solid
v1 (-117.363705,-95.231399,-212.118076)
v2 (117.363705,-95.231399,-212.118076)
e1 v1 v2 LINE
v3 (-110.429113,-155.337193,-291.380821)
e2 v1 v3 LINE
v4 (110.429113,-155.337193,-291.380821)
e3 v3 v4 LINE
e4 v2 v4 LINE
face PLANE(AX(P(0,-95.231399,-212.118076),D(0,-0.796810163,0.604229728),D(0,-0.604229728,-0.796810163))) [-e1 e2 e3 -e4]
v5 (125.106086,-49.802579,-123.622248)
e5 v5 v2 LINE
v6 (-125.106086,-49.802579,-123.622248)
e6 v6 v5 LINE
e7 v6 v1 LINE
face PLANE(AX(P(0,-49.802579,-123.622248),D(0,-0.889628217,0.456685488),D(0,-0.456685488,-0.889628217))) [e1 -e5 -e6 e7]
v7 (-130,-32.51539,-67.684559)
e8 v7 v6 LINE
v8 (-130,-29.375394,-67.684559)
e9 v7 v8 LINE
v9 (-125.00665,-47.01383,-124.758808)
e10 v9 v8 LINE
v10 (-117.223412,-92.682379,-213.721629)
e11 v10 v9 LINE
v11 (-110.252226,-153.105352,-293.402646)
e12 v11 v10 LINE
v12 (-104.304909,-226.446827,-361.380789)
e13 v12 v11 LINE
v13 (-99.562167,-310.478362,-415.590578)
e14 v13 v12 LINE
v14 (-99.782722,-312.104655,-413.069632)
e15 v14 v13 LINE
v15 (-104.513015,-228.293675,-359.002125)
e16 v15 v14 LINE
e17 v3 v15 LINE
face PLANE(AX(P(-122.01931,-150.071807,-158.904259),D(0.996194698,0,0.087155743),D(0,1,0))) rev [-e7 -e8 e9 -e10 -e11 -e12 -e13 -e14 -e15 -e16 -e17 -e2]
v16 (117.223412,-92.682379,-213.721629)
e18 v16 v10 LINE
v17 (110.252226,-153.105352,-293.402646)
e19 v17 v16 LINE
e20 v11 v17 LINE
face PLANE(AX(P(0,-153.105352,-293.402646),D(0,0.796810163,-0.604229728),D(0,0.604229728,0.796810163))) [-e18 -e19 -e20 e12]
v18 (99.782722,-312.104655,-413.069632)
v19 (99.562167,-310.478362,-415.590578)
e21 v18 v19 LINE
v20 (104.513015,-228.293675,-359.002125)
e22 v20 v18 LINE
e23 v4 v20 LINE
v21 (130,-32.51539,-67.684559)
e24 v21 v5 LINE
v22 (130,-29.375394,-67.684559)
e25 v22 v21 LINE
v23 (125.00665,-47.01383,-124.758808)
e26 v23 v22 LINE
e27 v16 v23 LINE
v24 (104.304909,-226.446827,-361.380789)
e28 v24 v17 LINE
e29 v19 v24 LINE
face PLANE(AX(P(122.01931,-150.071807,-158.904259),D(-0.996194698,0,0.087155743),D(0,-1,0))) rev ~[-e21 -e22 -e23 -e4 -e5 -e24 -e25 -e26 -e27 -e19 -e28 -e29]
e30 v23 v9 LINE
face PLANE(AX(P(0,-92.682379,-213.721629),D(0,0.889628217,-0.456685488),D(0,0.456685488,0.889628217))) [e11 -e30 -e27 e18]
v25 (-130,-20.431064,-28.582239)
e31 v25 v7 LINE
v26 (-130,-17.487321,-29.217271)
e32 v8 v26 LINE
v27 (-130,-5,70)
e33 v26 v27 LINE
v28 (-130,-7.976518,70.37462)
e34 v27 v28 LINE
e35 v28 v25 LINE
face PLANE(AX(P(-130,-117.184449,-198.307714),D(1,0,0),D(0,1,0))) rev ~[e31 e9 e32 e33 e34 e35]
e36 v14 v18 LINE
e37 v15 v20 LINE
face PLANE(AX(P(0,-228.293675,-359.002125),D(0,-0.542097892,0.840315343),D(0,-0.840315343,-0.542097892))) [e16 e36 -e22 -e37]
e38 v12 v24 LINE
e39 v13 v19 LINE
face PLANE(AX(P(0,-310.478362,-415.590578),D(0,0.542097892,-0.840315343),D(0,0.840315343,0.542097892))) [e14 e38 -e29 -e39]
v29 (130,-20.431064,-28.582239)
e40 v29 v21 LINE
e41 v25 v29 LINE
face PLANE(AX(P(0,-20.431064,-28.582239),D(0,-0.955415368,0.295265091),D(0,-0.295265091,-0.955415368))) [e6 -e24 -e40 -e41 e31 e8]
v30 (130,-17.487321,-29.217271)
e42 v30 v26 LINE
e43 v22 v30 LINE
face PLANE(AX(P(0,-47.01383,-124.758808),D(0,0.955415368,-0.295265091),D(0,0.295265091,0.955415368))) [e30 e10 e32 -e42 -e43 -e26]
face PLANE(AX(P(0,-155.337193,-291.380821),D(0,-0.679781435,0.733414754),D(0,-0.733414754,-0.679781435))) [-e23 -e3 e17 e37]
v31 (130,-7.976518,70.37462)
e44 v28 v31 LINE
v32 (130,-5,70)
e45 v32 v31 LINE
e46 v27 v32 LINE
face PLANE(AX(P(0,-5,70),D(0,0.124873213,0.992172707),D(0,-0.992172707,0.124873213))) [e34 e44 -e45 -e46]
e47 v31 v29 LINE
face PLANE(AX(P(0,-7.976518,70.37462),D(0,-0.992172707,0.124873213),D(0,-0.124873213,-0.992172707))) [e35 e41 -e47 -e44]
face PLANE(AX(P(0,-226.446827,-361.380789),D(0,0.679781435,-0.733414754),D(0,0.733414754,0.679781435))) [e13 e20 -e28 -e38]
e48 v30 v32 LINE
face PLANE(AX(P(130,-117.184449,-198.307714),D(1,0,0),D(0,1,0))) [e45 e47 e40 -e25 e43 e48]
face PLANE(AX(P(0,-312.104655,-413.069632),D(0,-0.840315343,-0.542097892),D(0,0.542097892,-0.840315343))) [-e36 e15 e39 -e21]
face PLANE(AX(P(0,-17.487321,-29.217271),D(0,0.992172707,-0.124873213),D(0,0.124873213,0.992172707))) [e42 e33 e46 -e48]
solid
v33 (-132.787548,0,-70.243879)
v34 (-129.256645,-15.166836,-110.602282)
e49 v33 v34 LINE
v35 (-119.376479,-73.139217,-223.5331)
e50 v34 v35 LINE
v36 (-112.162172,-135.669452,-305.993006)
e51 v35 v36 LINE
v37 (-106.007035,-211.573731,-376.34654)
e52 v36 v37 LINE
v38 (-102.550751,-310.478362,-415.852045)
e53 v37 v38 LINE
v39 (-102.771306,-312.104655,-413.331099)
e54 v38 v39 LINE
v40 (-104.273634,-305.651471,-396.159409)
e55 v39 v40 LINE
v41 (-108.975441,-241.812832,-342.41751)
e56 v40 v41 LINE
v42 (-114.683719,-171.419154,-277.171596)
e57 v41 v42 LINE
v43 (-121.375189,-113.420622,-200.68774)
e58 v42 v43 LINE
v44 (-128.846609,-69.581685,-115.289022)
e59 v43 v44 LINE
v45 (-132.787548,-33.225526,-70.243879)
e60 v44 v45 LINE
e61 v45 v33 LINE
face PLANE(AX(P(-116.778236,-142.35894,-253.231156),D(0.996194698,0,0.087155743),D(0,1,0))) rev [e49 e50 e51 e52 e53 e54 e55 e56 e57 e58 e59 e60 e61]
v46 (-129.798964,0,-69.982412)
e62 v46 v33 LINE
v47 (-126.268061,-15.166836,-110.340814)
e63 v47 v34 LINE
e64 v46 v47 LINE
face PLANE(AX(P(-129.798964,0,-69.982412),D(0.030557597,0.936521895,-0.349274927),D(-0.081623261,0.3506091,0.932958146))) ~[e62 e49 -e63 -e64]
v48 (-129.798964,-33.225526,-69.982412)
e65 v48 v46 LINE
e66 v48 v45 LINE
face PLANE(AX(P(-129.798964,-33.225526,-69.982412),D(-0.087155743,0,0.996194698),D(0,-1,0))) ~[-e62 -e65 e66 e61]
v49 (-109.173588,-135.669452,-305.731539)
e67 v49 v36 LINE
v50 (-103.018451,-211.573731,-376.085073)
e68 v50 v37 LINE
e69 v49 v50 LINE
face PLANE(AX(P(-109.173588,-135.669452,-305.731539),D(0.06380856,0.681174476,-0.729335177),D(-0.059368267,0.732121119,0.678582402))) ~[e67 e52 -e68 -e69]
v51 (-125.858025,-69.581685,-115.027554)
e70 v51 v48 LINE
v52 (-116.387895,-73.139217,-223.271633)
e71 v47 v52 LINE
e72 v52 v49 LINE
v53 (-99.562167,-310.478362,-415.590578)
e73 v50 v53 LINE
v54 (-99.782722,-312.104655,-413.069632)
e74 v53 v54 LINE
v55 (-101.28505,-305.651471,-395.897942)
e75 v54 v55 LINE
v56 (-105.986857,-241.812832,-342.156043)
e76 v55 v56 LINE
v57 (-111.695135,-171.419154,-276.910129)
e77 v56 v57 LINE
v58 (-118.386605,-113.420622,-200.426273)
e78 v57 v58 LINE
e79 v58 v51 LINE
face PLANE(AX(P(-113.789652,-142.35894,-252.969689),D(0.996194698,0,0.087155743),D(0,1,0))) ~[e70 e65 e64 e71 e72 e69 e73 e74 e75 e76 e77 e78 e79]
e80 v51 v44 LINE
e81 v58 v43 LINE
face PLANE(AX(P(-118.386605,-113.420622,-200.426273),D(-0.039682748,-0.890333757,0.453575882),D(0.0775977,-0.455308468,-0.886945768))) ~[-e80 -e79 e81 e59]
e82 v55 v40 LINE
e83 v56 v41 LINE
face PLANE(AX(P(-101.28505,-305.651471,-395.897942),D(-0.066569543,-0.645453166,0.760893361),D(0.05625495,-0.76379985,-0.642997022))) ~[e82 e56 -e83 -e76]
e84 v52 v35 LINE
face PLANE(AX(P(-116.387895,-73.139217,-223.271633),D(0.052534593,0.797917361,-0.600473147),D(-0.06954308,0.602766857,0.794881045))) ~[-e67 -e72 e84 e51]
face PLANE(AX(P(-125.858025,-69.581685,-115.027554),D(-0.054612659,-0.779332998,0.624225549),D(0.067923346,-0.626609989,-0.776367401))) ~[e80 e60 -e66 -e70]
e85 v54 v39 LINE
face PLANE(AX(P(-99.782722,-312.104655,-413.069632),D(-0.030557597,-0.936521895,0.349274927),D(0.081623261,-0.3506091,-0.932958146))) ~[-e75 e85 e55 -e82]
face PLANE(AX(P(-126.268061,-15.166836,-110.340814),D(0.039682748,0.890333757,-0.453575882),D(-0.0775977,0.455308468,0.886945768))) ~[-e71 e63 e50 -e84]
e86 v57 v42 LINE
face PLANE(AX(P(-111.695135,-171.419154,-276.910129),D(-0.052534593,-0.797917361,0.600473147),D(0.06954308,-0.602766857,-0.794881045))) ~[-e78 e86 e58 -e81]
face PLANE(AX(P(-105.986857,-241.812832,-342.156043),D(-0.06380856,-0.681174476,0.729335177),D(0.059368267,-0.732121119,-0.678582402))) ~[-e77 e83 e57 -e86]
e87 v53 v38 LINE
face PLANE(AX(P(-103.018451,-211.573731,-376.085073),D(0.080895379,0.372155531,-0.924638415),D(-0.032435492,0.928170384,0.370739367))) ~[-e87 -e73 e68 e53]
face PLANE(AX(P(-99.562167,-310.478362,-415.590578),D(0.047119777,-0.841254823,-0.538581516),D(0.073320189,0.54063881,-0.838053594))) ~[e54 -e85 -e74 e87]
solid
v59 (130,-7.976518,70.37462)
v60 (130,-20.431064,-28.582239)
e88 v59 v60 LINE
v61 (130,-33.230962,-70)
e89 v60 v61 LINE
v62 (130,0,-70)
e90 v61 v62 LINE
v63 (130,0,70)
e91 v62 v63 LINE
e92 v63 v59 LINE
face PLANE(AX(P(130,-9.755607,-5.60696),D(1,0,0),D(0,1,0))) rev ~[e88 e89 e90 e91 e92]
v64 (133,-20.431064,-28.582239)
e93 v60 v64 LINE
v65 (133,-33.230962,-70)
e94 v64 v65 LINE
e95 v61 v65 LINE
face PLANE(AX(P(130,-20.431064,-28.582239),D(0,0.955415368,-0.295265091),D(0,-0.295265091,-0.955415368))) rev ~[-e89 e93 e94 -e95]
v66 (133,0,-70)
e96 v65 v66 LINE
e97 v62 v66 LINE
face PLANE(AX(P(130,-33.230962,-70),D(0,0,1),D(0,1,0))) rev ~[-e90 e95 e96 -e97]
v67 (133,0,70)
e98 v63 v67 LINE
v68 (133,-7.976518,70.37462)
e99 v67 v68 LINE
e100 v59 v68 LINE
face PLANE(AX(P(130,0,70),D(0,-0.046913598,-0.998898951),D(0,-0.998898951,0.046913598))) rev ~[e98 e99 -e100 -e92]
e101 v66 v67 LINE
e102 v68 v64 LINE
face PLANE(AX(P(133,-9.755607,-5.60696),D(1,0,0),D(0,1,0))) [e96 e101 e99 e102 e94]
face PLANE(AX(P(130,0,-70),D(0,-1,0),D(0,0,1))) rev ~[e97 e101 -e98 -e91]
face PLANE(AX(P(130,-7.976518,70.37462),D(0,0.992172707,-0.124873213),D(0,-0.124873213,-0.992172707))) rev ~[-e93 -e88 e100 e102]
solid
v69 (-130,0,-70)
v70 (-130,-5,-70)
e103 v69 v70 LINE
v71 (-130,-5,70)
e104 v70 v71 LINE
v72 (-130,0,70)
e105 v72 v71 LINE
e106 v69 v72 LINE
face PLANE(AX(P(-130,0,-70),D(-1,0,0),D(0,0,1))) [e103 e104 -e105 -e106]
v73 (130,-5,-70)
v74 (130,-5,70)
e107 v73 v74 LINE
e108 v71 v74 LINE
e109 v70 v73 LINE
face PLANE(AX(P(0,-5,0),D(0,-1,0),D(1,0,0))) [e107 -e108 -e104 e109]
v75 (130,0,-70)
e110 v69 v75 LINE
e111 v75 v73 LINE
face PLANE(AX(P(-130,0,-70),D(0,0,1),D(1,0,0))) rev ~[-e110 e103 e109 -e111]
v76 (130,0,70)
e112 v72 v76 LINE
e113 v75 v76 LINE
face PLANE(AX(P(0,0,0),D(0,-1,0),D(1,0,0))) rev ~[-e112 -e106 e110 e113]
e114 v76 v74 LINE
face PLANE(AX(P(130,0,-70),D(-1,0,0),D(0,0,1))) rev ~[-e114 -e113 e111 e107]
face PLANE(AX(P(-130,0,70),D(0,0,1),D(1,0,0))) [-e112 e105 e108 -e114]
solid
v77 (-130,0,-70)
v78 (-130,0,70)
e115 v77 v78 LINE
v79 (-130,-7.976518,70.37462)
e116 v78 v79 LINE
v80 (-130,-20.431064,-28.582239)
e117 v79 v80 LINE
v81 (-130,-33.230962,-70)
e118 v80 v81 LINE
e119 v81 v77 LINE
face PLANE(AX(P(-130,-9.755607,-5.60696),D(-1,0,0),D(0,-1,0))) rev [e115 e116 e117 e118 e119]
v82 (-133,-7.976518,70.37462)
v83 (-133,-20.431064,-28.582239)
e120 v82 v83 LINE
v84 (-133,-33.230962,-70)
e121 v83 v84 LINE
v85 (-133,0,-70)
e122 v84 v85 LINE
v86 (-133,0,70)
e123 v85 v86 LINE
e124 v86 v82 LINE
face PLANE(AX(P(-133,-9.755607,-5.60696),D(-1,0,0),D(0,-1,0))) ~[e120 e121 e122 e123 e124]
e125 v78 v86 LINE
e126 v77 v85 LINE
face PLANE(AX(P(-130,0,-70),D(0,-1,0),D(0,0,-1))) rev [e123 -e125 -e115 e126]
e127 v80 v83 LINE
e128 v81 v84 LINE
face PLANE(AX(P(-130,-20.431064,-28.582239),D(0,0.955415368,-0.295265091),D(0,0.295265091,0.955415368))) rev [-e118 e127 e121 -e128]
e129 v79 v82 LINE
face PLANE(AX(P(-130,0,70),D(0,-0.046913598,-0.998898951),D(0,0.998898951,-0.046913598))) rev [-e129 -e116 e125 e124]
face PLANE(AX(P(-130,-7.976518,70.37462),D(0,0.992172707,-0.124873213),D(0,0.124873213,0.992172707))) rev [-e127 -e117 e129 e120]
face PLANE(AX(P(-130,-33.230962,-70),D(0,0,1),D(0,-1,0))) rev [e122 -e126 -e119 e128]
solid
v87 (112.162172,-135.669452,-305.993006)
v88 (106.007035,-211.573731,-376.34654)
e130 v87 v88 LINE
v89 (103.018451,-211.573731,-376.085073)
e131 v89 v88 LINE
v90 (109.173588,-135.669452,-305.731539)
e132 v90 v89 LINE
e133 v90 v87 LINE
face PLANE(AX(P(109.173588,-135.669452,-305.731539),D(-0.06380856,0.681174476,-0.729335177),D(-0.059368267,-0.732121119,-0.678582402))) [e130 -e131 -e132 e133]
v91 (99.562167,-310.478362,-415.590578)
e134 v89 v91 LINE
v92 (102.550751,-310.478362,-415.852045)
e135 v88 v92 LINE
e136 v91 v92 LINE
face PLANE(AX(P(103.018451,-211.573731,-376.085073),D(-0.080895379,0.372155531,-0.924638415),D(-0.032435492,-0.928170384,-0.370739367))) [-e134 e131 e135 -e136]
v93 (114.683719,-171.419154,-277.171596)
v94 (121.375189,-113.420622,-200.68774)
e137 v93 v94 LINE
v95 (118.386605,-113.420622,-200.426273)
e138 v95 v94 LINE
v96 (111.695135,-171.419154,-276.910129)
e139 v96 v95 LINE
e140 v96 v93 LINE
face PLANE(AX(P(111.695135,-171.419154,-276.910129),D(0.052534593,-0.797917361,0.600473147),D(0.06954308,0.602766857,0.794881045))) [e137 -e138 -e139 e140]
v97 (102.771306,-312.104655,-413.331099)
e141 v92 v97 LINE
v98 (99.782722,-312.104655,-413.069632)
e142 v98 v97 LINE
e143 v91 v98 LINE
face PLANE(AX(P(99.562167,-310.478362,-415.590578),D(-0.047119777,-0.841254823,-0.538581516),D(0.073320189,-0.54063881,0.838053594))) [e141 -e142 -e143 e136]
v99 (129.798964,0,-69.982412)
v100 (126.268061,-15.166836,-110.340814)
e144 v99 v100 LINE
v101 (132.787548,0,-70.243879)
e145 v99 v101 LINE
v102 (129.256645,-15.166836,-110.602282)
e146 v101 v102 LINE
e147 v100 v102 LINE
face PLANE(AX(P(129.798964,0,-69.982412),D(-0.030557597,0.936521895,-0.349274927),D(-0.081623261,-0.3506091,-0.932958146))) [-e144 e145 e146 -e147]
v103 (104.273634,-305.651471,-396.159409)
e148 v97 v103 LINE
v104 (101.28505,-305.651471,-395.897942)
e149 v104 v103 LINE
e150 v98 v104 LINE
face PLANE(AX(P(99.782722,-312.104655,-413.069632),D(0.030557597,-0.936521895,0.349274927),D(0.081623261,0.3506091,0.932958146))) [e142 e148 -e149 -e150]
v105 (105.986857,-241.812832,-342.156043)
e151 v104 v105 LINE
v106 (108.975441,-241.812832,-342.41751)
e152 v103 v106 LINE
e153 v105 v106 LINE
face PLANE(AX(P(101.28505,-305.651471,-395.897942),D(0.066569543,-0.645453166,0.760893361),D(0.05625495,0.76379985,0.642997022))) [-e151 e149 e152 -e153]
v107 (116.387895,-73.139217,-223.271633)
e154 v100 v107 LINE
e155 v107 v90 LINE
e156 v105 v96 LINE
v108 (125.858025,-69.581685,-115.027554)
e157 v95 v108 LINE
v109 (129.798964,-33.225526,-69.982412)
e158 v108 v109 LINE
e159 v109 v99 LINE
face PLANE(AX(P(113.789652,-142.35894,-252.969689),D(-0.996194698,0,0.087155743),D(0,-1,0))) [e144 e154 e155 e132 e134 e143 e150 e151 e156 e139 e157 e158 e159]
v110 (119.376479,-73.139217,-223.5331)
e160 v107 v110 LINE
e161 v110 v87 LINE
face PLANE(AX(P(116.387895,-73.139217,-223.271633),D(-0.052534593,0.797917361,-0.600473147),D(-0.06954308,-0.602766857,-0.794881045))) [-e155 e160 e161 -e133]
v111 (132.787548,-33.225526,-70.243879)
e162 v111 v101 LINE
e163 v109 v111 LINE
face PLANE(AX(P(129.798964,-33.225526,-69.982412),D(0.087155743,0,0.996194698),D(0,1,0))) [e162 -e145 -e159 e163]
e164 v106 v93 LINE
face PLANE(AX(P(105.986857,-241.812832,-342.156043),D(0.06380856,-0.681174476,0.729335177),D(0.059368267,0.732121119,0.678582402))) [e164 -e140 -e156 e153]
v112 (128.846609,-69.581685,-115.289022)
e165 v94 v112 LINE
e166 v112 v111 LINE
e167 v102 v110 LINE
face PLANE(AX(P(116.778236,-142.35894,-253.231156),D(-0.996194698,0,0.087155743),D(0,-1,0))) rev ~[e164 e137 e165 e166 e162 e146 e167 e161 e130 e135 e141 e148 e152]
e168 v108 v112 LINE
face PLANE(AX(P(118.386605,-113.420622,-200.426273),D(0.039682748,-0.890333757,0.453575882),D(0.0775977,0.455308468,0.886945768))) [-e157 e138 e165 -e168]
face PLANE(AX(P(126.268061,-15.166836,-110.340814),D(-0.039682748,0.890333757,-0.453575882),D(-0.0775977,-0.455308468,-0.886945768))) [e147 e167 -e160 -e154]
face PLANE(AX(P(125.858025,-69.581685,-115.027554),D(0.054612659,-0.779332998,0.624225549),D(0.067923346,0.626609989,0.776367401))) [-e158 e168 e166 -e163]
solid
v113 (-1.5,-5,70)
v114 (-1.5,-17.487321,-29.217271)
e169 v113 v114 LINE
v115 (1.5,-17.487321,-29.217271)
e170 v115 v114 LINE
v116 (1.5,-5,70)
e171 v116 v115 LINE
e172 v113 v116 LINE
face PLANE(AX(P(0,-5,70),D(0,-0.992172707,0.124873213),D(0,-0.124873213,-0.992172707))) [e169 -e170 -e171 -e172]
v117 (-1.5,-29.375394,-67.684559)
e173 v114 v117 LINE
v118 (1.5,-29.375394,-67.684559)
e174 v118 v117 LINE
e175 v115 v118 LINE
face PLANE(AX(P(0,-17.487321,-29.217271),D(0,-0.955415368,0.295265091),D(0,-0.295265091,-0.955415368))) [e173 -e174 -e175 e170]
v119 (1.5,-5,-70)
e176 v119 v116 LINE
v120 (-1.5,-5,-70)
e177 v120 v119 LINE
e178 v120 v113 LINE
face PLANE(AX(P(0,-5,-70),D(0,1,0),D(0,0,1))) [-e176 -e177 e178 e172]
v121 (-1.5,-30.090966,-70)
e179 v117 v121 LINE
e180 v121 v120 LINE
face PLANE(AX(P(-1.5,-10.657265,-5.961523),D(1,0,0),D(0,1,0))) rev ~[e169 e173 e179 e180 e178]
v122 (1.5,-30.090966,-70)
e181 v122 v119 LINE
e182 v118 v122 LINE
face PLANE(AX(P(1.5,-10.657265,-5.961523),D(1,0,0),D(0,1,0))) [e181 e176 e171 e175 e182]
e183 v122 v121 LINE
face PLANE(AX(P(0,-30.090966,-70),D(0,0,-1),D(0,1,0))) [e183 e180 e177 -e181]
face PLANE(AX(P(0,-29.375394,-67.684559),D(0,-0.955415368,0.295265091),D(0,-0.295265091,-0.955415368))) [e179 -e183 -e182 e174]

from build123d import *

# Parameters (mm, degrees)
F0_W      = 260
F0_H      = 140
F1_DEPTH  = 5
F3_DEPTH  = 130
F7_W      = 657.2483032942
F7_H      = 632.9057961702
F8_DEPTH  = 174
F12_DEPTH = 3
F14_DEPTH = 3
F16_DEPTH = 1.5


with BuildPart() as f1:
    # F0 (on Front) → F1 (new body)
    with BuildSketch(Plane.XZ):
        Rectangle(F0_W, F0_H)
    extrude(amount=F1_DEPTH)


with BuildPart() as f3:
    # F2 (on Right) → F3 (new body, symmetric)
    with BuildSketch(Plane.YZ):
        Polygon((-17.4873212862, -29.2172707098), (-5, 70), (-7.9765181213, 70.3746196386), (-20.4310644359, -28.5822394788), (-49.8025794157, -123.622248239), (-95.2313994122, -212.1180756609), (-155.3371927178, -291.3808208093), (-228.2936752181, -359.0021252816), (-312.1046553088, -413.0696322199), (-310.4783616328, -415.5905782486), (-226.4468273432, -361.3807890501), (-153.1053519834, -293.4026455624), (-92.6823791695, -213.7216292766), (-47.013830355, -124.7588075522), align=None)
    extrude(amount=F3_DEPTH, both=True)


with BuildPart() as f8:
    # F7 (on face) → F8 (new body)
    with BuildSketch(Plane(origin=(134.8891541046, 0, -11.8012718167), x_dir=(0, -1, 0), z_dir=(-0.9961946981, 0, 0.0871557427))):
        with Locations((150.0718072057, -147.6648971438)):
            Rectangle(F7_W, F7_H)
    extrude(amount=-F8_DEPTH)


with BuildPart() as f9_1:
    # F9: instance of F8
    add(f8.part.mirror(Plane.YZ))


with BuildPart() as f3_1:
    add(f3.part)

    # F10: cut F9_1, F8
    add(f9_1.part, mode=Mode.SUBTRACT)
    add(f8.part, mode=Mode.SUBTRACT)


with BuildPart() as f12:
    # F11 (on face) → F12 (new body)
    with BuildSketch(Plane(origin=(134.8891541046, 0, -11.8012718167), x_dir=(0, -1, 0), z_dir=(-0.9961946981, 0, 0.0871557427))):
        Polygon((305.6514709987, -385.5638570208), (241.8128323534, -331.6166724948), (171.4191538735, -266.1215299442), (113.4206222217, -189.3455181509), (69.5816849654, -103.6205900856), (33.2255263913, -58.4033823092), (0, -58.4033823092), (15.1668360589, -98.9159475502), (73.139217219, -212.2781437109), (135.6694516868, -295.0530326988), (211.573731067, -365.6753059705), (310.4783616328, -405.3317159841), (312.1046553088, -402.8011403512), align=None)
    extrude(amount=-F12_DEPTH)


with BuildPart() as f14:
    # F13 (on face) → F14 (new body)
    with BuildSketch(Plane.YZ.offset(130)):
        Polygon((0, 70), (-7.9765181213, 70.3746196386), (-20.4310644359, -28.5822394788), (-33.230961968, -70), (0, -70), align=None)
    extrude(amount=F14_DEPTH)


with BuildPart() as f16:
    # F15 (on Right) → F16 (new body, symmetric)
    with BuildSketch(Plane.YZ):
        Polygon((-30.0909664235, -70), (-5, -70), (-5, 70), (-17.4873212862, -29.2172707098), (-29.3753939774, -67.684558948), align=None)
    extrude(amount=F16_DEPTH, both=True)


with BuildPart() as f17_1:
    # F17: instance of F14
    add(f14.part.mirror(Plane.YZ))


with BuildPart() as f17_2:
    # F17: instance of F12
    add(f12.part.mirror(Plane.YZ))


solid = Compound([f1.part, f3_1.part, f12.part, f14.part, f16.part, f17_1.part, f17_2.part])
